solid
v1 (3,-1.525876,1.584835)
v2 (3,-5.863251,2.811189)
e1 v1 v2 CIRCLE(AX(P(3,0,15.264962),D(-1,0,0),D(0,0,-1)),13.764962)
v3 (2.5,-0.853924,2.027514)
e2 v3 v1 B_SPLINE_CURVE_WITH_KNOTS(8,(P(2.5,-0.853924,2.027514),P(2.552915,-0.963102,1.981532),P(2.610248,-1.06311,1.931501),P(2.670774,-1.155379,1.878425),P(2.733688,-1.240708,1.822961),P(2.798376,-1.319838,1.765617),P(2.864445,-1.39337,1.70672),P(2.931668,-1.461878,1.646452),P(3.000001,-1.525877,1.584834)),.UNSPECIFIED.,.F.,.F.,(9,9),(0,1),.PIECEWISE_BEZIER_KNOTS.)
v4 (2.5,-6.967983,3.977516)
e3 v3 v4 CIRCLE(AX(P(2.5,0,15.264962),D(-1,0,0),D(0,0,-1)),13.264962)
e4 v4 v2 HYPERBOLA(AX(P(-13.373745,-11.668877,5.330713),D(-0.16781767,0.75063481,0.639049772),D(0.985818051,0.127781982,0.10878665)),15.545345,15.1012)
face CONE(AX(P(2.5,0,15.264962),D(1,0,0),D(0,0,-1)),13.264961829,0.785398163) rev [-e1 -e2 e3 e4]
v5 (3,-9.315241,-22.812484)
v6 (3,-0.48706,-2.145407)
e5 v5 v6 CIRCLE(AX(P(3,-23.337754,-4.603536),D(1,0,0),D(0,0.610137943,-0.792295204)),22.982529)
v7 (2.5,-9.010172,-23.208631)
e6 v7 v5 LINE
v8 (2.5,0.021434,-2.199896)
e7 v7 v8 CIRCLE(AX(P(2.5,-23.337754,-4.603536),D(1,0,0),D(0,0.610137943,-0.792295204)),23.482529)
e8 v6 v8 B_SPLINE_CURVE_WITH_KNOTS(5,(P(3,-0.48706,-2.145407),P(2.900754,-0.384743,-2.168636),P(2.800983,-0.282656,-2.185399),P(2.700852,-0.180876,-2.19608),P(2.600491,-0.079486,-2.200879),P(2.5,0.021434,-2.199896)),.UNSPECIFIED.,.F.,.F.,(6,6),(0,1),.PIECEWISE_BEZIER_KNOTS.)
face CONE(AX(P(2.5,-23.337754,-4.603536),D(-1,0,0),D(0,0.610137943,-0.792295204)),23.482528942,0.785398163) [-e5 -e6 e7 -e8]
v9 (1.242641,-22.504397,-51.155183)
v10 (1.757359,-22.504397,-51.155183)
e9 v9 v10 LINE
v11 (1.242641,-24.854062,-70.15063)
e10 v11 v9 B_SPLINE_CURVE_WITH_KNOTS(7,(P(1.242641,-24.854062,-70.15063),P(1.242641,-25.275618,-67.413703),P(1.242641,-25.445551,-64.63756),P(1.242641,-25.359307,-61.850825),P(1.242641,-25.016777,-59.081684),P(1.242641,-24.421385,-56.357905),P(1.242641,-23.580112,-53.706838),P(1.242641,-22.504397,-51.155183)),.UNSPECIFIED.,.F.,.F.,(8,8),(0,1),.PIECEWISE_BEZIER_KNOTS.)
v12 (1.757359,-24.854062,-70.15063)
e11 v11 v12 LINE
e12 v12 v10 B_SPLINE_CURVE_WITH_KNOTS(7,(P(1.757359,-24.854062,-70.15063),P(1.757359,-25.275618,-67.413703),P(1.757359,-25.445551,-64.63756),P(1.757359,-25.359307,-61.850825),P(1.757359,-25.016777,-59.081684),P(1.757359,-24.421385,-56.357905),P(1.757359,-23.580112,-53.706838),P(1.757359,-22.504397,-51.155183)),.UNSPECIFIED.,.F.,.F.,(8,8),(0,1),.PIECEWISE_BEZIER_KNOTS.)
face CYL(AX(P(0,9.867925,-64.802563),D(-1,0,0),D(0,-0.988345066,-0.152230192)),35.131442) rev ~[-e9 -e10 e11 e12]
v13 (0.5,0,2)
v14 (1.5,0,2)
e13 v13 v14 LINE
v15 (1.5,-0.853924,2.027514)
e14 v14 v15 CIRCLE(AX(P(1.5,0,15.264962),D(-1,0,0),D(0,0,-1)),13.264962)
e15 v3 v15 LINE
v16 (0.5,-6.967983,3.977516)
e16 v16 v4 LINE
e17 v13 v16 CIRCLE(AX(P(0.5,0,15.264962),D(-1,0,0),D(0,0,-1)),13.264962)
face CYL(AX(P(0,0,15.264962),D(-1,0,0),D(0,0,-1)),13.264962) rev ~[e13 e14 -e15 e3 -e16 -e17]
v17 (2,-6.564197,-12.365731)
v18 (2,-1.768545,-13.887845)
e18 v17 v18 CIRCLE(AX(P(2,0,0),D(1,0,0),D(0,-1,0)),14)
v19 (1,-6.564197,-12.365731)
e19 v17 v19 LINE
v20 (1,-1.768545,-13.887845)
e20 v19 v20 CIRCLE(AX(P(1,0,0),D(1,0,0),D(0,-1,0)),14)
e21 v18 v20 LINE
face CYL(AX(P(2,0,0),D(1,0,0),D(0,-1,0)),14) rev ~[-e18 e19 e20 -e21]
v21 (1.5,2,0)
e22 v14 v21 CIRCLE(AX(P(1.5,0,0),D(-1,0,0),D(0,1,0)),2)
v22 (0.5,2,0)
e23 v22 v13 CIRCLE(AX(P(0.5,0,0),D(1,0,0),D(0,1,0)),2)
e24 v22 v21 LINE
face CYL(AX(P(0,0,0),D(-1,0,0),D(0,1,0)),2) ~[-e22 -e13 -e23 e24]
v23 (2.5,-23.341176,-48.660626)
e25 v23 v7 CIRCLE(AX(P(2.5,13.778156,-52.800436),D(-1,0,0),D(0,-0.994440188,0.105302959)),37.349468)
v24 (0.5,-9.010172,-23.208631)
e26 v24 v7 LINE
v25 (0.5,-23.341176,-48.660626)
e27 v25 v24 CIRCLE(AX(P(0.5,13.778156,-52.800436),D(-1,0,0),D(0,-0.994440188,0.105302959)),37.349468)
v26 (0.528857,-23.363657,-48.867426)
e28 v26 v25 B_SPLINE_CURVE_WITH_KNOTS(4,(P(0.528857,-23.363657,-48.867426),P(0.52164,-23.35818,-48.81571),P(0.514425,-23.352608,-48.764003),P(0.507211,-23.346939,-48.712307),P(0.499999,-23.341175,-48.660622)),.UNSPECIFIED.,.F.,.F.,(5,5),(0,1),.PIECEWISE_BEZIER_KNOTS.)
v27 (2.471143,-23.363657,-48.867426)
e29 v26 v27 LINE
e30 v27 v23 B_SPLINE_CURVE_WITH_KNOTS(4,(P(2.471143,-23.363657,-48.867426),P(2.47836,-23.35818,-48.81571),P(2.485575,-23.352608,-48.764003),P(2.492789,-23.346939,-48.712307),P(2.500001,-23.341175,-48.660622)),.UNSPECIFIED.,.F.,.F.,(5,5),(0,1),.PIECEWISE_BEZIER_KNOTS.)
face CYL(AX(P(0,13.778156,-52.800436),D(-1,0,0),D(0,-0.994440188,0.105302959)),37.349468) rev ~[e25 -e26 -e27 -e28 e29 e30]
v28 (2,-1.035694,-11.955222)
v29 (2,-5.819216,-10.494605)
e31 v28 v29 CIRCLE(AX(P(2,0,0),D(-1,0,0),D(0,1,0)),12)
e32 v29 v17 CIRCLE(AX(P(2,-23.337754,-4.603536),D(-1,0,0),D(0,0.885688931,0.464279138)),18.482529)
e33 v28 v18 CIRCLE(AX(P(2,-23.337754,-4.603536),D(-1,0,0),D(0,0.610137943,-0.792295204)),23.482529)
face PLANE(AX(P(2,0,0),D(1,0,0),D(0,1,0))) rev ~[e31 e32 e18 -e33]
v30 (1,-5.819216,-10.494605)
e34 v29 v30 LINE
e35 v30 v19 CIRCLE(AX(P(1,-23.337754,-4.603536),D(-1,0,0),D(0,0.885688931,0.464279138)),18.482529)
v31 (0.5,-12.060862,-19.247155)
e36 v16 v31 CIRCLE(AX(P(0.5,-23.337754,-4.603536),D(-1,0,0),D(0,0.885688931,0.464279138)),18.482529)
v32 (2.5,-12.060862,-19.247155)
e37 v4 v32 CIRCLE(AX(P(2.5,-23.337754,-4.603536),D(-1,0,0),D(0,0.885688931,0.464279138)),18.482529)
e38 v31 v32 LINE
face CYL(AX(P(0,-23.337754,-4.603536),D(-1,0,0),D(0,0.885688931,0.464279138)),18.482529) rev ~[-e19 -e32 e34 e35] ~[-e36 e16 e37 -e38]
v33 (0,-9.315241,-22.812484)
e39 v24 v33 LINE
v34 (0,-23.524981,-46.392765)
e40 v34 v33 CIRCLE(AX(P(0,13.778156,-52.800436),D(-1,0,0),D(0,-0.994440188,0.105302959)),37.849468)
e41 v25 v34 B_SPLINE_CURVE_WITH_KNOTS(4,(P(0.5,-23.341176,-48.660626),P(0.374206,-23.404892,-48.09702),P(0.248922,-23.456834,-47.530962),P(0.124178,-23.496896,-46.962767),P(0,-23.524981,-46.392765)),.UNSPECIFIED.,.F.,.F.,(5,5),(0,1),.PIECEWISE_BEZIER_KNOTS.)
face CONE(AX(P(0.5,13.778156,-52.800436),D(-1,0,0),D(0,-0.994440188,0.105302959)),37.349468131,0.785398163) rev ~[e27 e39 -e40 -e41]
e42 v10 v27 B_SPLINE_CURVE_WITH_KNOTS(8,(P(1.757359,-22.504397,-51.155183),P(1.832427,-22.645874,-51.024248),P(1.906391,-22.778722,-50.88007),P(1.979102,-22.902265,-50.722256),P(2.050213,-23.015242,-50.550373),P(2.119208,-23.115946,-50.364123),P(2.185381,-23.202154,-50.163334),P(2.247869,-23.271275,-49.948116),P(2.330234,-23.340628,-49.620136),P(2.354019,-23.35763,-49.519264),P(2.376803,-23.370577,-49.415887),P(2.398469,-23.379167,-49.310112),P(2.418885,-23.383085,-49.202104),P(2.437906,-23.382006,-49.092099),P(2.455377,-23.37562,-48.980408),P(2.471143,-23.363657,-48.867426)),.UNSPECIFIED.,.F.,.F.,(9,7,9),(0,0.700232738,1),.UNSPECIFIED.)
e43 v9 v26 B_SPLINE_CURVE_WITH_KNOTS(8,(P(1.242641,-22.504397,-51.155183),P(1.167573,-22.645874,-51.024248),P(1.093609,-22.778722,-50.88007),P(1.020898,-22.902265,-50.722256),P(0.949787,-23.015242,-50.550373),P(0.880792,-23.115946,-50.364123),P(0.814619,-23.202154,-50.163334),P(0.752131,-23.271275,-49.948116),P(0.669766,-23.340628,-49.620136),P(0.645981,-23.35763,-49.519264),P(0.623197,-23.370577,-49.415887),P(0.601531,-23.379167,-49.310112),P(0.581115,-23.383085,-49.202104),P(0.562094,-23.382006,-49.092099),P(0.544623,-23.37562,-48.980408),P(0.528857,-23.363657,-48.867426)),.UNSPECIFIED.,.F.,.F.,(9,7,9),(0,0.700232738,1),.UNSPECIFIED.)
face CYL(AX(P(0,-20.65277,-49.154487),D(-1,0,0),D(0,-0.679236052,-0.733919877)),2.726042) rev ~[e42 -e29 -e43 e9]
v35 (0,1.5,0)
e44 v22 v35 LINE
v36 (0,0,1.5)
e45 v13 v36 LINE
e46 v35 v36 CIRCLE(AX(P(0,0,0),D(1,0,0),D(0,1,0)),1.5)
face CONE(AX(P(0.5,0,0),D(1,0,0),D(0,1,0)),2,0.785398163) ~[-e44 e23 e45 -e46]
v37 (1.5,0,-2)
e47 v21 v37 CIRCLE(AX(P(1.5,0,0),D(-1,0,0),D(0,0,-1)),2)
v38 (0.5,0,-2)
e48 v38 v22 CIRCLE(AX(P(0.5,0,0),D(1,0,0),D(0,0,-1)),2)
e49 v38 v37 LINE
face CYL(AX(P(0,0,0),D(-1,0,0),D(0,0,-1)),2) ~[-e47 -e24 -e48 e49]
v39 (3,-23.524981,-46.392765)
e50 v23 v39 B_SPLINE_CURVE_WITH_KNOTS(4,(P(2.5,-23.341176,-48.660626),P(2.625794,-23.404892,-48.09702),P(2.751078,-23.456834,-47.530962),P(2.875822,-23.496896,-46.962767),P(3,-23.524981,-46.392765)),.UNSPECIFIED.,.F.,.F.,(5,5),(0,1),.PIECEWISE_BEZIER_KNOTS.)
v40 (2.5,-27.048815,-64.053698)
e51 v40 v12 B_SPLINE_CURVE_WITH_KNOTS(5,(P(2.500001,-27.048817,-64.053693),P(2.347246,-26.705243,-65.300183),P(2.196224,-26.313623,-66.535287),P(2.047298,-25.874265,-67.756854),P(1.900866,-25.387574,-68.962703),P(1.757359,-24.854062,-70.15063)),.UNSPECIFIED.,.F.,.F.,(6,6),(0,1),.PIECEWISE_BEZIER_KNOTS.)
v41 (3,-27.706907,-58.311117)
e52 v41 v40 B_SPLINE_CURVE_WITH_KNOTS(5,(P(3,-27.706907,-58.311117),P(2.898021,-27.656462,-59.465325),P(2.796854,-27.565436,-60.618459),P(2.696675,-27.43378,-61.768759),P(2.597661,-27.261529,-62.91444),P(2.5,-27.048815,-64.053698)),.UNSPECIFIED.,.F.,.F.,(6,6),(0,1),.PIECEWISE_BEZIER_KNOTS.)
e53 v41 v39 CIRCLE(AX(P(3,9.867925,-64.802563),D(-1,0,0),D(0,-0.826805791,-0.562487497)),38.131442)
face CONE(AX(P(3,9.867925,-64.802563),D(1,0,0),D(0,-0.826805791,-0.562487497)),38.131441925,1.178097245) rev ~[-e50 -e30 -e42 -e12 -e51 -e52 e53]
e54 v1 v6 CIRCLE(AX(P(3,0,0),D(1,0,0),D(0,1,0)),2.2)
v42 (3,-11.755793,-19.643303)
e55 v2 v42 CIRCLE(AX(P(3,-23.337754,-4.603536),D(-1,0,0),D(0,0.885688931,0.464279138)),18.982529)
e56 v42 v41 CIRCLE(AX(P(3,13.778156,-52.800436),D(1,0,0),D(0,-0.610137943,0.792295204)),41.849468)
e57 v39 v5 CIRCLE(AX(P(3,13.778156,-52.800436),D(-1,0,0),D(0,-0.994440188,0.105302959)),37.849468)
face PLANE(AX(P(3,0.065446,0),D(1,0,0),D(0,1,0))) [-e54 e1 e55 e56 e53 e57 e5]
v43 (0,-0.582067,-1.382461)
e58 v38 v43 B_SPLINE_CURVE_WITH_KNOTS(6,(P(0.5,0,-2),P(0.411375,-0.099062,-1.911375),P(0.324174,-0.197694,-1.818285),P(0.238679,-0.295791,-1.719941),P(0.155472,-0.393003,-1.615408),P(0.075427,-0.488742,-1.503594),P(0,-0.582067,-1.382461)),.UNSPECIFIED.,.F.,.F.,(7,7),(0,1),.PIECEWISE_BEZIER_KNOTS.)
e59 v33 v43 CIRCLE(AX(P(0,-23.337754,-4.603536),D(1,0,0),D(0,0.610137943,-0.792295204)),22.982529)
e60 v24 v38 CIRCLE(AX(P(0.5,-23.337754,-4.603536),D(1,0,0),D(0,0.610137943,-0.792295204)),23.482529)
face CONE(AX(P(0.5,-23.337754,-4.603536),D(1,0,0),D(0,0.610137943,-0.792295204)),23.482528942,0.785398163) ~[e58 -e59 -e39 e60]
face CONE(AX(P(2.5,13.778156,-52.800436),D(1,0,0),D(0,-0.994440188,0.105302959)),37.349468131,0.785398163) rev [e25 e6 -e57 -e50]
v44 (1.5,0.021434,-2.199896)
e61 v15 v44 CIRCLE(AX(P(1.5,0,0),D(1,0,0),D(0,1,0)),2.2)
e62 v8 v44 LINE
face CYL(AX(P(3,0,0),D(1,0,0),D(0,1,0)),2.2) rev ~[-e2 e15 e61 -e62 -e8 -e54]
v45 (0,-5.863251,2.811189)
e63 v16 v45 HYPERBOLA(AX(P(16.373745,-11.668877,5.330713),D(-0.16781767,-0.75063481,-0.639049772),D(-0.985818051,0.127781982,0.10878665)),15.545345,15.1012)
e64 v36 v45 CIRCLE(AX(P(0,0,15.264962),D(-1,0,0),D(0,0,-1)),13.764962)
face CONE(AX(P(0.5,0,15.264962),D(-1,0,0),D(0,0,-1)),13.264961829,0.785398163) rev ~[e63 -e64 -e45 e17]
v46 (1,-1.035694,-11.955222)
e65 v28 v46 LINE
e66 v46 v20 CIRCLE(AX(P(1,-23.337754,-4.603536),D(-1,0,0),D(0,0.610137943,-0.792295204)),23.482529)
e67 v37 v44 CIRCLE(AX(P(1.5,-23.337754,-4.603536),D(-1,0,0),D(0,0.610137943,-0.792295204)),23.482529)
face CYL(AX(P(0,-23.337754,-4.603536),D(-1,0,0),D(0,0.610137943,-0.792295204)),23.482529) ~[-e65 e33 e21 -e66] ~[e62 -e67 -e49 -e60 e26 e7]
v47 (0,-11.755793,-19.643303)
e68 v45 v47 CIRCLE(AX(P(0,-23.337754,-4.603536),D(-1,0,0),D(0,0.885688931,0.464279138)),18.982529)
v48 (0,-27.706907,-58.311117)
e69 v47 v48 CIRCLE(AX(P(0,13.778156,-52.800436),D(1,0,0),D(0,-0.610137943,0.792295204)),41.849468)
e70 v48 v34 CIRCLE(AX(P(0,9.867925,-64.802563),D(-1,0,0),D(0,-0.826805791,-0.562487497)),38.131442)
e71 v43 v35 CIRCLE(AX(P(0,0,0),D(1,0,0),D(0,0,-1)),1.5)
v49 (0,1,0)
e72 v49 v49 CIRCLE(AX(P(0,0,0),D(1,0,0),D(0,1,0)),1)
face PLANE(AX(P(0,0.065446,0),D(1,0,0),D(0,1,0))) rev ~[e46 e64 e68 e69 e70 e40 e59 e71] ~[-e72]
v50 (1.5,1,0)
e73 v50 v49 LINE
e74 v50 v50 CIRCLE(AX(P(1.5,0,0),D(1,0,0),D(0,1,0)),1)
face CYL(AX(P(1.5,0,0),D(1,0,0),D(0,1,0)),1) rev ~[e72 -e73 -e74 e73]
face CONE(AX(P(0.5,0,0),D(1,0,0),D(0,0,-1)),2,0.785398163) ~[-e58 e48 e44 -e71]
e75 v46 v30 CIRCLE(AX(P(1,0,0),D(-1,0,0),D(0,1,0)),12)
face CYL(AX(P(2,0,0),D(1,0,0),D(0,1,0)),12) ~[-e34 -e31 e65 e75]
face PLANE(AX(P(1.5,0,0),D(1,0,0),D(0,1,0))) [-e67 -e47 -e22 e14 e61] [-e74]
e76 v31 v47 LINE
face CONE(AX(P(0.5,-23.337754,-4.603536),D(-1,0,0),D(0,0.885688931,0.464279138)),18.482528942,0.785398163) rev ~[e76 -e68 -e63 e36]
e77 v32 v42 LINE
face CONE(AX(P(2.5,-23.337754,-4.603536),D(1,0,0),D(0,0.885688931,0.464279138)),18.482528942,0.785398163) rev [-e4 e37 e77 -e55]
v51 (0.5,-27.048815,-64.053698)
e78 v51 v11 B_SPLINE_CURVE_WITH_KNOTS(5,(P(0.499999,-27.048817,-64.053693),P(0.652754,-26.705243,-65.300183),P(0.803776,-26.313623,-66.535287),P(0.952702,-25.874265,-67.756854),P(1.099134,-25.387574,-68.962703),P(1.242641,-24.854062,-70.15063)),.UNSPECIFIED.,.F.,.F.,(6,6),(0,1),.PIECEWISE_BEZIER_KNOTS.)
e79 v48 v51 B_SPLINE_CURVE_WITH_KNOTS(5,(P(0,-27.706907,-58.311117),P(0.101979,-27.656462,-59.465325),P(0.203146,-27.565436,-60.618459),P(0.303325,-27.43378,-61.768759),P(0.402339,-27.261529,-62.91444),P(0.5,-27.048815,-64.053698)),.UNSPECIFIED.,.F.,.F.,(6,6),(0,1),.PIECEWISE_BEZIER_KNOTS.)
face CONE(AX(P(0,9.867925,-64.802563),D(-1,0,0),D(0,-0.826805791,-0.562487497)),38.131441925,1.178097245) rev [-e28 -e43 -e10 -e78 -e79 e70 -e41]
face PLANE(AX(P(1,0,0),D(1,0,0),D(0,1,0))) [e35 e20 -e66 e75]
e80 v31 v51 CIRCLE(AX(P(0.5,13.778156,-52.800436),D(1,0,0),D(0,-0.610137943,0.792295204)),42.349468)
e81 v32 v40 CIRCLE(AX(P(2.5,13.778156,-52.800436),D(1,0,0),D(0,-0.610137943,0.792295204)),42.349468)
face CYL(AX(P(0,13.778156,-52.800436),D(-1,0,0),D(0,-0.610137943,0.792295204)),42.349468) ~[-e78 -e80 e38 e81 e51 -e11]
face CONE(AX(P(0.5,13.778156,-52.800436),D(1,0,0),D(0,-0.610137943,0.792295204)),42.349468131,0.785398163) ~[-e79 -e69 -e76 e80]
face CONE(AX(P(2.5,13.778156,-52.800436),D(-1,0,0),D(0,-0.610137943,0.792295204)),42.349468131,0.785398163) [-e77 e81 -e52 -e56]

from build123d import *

# Parameters (mm, degrees)
F1_DEPTH    = 3
F2_SIZE     = 0.5
F3_R        = 2.2
F4_DEPTH    = 1.5
F5_R        = 1
F6_DEPTH    = 25
F7_T2_ANGLE = 66.979105944
F7_T4_ANGLE = 66.979105944
F9_START    = -1
F9_DEPTH    = 1


# Not quite as in the source:
# - a fillet or chamfer that OpenCascade refuses, or shapes differently, is made with other operations: its cross-section is extruded or revolved along the edge and cut away or added


with BuildPart() as f1:
    # F0 (on Right) → F1 (new body)
    with BuildSketch(Plane.YZ):
        with BuildLine():
            ThreePointArc((0, -2), (1.4142135624, -1.4142135624), (2, 0))
            ThreePointArc((2, 0), (1.4142135624, 1.4142135624), (0, 2))
            ThreePointArc((0, 2), (-2, 0), (0, -2))
        make_face()
        with BuildLine():
            ThreePointArc((0, -2), (-2, 0), (0, 2))
            ThreePointArc((0, 2), (-3.6215795528, 2.5039519212), (-6.9679827429, 3.9775162004))
            ThreePointArc((-6.9679827429, 3.9775162004), (-5.2841991645, -8.562454479), (-12.0608618515, -19.247155439))
            ThreePointArc((-12.0608618515, -19.247155439), (-27.2940486142, -42.4780574149), (-24.8540620048, -70.1506295922))
            ThreePointArc((-24.8540620048, -70.1506295922), (-24.9977932498, -60.4898051339), (-22.5043967366, -51.1551834643))
            ThreePointArc((-22.5043967366, -51.1551834643), (-23.2047477115, -50.1129852075), (-23.3636565752, -48.8674264303))
            ThreePointArc((-23.3636565752, -48.8674264303), (-18.817838904, -34.5662944148), (-9.0101721364, -23.2086314596))
            ThreePointArc((-9.0101721364, -23.2086314596), (-1.7247742588, -13.7854899156), (0, -2))
        make_face()
    extrude(amount=F1_DEPTH)

    # F2
    f2_edges = [f1.edges().sort_by_distance(p)[0] for p in [
        (3, 2, 0),
        (3, -3.62158, 2.503952),
        (3, -5.284199, -8.562454),
        (3, -27.294049, -42.478057),
        (3, -24.997793, -60.489805),
        (3, -23.204748, -50.112985),
        (3, -18.817839, -34.566294),
        (3, -1.724774, -13.78549),
        (0, 2, 0),
        (0, -3.62158, 2.503952),
        (0, -5.284199, -8.562454),
        (0, -27.294049, -42.478057),
        (0, -24.997793, -60.489805),
        (0, -23.204748, -50.112985),
        (0, -18.817839, -34.566294),
        (0, -1.724774, -13.78549),
    ]]
    chamfer(f2_edges, length=F2_SIZE)

    # F3 (on face) → F4 (cut)
    with BuildSketch(Plane.YZ.offset(3)):
        Circle(F3_R)
    extrude(amount=-F4_DEPTH, mode=Mode.SUBTRACT)

    # F5 (on face) → F6 (cut)
    with BuildSketch(Plane.YZ.offset(1.5)):
        Circle(F5_R)
    extrude(amount=-F6_DEPTH, mode=Mode.SUBTRACT)

    # F7: chamfer of 2.5 on 2 edges, made by hand

    # F7_s1 → F7_t2 (revolve, cut)
    with BuildSketch(Plane(origin=(0, 33.2597277938, -48.8887943232), x_dir=(1, 0, 0), z_dir=(0, 0.5624874969, -0.8268057909))):
        Polygon((0, 66.4232158642), (1.767766953, 62.1554489112), (0, 63.9232158642), align=None)
    revolve(axis=Axis((0, 9.8679252657, -64.8025634284), (-1, 0, 0)), revolution_arc=F7_T2_ANGLE, mode=Mode.SUBTRACT)

    # F7_s3 → F7_t4 (revolve, cut)
    with BuildSketch(Plane(origin=(0, 33.2597277938, -48.8887943232), x_dir=(1, 0, 0), z_dir=(0, 0.5624874969, -0.8268057909))):
        Polygon((3, 66.4232158642), (1.232233047, 62.1554489112), (3, 63.9232158642), align=None)
    revolve(axis=Axis((3, 9.8679252657, -64.8025634284), (-1, 0, 0)), revolution_arc=F7_T4_ANGLE, mode=Mode.SUBTRACT)

    # F8 (on face) → F9 (cut)
    with BuildSketch(Plane.YZ.offset(3).offset(F9_START)):
        with BuildLine():
            ThreePointArc((14, 0), (0, 14), (-14, 0))
            ThreePointArc((-14, 0), (0, -14), (14, 0))
        make_face()
        with BuildLine():
            ThreePointArc((-12, 0), (0, 12), (12, 0))
            ThreePointArc((12, 0), (0, -12), (-12, 0))
        make_face(mode=Mode.SUBTRACT)
    extrude(amount=-F9_DEPTH, mode=Mode.SUBTRACT)


solid = f1.part
